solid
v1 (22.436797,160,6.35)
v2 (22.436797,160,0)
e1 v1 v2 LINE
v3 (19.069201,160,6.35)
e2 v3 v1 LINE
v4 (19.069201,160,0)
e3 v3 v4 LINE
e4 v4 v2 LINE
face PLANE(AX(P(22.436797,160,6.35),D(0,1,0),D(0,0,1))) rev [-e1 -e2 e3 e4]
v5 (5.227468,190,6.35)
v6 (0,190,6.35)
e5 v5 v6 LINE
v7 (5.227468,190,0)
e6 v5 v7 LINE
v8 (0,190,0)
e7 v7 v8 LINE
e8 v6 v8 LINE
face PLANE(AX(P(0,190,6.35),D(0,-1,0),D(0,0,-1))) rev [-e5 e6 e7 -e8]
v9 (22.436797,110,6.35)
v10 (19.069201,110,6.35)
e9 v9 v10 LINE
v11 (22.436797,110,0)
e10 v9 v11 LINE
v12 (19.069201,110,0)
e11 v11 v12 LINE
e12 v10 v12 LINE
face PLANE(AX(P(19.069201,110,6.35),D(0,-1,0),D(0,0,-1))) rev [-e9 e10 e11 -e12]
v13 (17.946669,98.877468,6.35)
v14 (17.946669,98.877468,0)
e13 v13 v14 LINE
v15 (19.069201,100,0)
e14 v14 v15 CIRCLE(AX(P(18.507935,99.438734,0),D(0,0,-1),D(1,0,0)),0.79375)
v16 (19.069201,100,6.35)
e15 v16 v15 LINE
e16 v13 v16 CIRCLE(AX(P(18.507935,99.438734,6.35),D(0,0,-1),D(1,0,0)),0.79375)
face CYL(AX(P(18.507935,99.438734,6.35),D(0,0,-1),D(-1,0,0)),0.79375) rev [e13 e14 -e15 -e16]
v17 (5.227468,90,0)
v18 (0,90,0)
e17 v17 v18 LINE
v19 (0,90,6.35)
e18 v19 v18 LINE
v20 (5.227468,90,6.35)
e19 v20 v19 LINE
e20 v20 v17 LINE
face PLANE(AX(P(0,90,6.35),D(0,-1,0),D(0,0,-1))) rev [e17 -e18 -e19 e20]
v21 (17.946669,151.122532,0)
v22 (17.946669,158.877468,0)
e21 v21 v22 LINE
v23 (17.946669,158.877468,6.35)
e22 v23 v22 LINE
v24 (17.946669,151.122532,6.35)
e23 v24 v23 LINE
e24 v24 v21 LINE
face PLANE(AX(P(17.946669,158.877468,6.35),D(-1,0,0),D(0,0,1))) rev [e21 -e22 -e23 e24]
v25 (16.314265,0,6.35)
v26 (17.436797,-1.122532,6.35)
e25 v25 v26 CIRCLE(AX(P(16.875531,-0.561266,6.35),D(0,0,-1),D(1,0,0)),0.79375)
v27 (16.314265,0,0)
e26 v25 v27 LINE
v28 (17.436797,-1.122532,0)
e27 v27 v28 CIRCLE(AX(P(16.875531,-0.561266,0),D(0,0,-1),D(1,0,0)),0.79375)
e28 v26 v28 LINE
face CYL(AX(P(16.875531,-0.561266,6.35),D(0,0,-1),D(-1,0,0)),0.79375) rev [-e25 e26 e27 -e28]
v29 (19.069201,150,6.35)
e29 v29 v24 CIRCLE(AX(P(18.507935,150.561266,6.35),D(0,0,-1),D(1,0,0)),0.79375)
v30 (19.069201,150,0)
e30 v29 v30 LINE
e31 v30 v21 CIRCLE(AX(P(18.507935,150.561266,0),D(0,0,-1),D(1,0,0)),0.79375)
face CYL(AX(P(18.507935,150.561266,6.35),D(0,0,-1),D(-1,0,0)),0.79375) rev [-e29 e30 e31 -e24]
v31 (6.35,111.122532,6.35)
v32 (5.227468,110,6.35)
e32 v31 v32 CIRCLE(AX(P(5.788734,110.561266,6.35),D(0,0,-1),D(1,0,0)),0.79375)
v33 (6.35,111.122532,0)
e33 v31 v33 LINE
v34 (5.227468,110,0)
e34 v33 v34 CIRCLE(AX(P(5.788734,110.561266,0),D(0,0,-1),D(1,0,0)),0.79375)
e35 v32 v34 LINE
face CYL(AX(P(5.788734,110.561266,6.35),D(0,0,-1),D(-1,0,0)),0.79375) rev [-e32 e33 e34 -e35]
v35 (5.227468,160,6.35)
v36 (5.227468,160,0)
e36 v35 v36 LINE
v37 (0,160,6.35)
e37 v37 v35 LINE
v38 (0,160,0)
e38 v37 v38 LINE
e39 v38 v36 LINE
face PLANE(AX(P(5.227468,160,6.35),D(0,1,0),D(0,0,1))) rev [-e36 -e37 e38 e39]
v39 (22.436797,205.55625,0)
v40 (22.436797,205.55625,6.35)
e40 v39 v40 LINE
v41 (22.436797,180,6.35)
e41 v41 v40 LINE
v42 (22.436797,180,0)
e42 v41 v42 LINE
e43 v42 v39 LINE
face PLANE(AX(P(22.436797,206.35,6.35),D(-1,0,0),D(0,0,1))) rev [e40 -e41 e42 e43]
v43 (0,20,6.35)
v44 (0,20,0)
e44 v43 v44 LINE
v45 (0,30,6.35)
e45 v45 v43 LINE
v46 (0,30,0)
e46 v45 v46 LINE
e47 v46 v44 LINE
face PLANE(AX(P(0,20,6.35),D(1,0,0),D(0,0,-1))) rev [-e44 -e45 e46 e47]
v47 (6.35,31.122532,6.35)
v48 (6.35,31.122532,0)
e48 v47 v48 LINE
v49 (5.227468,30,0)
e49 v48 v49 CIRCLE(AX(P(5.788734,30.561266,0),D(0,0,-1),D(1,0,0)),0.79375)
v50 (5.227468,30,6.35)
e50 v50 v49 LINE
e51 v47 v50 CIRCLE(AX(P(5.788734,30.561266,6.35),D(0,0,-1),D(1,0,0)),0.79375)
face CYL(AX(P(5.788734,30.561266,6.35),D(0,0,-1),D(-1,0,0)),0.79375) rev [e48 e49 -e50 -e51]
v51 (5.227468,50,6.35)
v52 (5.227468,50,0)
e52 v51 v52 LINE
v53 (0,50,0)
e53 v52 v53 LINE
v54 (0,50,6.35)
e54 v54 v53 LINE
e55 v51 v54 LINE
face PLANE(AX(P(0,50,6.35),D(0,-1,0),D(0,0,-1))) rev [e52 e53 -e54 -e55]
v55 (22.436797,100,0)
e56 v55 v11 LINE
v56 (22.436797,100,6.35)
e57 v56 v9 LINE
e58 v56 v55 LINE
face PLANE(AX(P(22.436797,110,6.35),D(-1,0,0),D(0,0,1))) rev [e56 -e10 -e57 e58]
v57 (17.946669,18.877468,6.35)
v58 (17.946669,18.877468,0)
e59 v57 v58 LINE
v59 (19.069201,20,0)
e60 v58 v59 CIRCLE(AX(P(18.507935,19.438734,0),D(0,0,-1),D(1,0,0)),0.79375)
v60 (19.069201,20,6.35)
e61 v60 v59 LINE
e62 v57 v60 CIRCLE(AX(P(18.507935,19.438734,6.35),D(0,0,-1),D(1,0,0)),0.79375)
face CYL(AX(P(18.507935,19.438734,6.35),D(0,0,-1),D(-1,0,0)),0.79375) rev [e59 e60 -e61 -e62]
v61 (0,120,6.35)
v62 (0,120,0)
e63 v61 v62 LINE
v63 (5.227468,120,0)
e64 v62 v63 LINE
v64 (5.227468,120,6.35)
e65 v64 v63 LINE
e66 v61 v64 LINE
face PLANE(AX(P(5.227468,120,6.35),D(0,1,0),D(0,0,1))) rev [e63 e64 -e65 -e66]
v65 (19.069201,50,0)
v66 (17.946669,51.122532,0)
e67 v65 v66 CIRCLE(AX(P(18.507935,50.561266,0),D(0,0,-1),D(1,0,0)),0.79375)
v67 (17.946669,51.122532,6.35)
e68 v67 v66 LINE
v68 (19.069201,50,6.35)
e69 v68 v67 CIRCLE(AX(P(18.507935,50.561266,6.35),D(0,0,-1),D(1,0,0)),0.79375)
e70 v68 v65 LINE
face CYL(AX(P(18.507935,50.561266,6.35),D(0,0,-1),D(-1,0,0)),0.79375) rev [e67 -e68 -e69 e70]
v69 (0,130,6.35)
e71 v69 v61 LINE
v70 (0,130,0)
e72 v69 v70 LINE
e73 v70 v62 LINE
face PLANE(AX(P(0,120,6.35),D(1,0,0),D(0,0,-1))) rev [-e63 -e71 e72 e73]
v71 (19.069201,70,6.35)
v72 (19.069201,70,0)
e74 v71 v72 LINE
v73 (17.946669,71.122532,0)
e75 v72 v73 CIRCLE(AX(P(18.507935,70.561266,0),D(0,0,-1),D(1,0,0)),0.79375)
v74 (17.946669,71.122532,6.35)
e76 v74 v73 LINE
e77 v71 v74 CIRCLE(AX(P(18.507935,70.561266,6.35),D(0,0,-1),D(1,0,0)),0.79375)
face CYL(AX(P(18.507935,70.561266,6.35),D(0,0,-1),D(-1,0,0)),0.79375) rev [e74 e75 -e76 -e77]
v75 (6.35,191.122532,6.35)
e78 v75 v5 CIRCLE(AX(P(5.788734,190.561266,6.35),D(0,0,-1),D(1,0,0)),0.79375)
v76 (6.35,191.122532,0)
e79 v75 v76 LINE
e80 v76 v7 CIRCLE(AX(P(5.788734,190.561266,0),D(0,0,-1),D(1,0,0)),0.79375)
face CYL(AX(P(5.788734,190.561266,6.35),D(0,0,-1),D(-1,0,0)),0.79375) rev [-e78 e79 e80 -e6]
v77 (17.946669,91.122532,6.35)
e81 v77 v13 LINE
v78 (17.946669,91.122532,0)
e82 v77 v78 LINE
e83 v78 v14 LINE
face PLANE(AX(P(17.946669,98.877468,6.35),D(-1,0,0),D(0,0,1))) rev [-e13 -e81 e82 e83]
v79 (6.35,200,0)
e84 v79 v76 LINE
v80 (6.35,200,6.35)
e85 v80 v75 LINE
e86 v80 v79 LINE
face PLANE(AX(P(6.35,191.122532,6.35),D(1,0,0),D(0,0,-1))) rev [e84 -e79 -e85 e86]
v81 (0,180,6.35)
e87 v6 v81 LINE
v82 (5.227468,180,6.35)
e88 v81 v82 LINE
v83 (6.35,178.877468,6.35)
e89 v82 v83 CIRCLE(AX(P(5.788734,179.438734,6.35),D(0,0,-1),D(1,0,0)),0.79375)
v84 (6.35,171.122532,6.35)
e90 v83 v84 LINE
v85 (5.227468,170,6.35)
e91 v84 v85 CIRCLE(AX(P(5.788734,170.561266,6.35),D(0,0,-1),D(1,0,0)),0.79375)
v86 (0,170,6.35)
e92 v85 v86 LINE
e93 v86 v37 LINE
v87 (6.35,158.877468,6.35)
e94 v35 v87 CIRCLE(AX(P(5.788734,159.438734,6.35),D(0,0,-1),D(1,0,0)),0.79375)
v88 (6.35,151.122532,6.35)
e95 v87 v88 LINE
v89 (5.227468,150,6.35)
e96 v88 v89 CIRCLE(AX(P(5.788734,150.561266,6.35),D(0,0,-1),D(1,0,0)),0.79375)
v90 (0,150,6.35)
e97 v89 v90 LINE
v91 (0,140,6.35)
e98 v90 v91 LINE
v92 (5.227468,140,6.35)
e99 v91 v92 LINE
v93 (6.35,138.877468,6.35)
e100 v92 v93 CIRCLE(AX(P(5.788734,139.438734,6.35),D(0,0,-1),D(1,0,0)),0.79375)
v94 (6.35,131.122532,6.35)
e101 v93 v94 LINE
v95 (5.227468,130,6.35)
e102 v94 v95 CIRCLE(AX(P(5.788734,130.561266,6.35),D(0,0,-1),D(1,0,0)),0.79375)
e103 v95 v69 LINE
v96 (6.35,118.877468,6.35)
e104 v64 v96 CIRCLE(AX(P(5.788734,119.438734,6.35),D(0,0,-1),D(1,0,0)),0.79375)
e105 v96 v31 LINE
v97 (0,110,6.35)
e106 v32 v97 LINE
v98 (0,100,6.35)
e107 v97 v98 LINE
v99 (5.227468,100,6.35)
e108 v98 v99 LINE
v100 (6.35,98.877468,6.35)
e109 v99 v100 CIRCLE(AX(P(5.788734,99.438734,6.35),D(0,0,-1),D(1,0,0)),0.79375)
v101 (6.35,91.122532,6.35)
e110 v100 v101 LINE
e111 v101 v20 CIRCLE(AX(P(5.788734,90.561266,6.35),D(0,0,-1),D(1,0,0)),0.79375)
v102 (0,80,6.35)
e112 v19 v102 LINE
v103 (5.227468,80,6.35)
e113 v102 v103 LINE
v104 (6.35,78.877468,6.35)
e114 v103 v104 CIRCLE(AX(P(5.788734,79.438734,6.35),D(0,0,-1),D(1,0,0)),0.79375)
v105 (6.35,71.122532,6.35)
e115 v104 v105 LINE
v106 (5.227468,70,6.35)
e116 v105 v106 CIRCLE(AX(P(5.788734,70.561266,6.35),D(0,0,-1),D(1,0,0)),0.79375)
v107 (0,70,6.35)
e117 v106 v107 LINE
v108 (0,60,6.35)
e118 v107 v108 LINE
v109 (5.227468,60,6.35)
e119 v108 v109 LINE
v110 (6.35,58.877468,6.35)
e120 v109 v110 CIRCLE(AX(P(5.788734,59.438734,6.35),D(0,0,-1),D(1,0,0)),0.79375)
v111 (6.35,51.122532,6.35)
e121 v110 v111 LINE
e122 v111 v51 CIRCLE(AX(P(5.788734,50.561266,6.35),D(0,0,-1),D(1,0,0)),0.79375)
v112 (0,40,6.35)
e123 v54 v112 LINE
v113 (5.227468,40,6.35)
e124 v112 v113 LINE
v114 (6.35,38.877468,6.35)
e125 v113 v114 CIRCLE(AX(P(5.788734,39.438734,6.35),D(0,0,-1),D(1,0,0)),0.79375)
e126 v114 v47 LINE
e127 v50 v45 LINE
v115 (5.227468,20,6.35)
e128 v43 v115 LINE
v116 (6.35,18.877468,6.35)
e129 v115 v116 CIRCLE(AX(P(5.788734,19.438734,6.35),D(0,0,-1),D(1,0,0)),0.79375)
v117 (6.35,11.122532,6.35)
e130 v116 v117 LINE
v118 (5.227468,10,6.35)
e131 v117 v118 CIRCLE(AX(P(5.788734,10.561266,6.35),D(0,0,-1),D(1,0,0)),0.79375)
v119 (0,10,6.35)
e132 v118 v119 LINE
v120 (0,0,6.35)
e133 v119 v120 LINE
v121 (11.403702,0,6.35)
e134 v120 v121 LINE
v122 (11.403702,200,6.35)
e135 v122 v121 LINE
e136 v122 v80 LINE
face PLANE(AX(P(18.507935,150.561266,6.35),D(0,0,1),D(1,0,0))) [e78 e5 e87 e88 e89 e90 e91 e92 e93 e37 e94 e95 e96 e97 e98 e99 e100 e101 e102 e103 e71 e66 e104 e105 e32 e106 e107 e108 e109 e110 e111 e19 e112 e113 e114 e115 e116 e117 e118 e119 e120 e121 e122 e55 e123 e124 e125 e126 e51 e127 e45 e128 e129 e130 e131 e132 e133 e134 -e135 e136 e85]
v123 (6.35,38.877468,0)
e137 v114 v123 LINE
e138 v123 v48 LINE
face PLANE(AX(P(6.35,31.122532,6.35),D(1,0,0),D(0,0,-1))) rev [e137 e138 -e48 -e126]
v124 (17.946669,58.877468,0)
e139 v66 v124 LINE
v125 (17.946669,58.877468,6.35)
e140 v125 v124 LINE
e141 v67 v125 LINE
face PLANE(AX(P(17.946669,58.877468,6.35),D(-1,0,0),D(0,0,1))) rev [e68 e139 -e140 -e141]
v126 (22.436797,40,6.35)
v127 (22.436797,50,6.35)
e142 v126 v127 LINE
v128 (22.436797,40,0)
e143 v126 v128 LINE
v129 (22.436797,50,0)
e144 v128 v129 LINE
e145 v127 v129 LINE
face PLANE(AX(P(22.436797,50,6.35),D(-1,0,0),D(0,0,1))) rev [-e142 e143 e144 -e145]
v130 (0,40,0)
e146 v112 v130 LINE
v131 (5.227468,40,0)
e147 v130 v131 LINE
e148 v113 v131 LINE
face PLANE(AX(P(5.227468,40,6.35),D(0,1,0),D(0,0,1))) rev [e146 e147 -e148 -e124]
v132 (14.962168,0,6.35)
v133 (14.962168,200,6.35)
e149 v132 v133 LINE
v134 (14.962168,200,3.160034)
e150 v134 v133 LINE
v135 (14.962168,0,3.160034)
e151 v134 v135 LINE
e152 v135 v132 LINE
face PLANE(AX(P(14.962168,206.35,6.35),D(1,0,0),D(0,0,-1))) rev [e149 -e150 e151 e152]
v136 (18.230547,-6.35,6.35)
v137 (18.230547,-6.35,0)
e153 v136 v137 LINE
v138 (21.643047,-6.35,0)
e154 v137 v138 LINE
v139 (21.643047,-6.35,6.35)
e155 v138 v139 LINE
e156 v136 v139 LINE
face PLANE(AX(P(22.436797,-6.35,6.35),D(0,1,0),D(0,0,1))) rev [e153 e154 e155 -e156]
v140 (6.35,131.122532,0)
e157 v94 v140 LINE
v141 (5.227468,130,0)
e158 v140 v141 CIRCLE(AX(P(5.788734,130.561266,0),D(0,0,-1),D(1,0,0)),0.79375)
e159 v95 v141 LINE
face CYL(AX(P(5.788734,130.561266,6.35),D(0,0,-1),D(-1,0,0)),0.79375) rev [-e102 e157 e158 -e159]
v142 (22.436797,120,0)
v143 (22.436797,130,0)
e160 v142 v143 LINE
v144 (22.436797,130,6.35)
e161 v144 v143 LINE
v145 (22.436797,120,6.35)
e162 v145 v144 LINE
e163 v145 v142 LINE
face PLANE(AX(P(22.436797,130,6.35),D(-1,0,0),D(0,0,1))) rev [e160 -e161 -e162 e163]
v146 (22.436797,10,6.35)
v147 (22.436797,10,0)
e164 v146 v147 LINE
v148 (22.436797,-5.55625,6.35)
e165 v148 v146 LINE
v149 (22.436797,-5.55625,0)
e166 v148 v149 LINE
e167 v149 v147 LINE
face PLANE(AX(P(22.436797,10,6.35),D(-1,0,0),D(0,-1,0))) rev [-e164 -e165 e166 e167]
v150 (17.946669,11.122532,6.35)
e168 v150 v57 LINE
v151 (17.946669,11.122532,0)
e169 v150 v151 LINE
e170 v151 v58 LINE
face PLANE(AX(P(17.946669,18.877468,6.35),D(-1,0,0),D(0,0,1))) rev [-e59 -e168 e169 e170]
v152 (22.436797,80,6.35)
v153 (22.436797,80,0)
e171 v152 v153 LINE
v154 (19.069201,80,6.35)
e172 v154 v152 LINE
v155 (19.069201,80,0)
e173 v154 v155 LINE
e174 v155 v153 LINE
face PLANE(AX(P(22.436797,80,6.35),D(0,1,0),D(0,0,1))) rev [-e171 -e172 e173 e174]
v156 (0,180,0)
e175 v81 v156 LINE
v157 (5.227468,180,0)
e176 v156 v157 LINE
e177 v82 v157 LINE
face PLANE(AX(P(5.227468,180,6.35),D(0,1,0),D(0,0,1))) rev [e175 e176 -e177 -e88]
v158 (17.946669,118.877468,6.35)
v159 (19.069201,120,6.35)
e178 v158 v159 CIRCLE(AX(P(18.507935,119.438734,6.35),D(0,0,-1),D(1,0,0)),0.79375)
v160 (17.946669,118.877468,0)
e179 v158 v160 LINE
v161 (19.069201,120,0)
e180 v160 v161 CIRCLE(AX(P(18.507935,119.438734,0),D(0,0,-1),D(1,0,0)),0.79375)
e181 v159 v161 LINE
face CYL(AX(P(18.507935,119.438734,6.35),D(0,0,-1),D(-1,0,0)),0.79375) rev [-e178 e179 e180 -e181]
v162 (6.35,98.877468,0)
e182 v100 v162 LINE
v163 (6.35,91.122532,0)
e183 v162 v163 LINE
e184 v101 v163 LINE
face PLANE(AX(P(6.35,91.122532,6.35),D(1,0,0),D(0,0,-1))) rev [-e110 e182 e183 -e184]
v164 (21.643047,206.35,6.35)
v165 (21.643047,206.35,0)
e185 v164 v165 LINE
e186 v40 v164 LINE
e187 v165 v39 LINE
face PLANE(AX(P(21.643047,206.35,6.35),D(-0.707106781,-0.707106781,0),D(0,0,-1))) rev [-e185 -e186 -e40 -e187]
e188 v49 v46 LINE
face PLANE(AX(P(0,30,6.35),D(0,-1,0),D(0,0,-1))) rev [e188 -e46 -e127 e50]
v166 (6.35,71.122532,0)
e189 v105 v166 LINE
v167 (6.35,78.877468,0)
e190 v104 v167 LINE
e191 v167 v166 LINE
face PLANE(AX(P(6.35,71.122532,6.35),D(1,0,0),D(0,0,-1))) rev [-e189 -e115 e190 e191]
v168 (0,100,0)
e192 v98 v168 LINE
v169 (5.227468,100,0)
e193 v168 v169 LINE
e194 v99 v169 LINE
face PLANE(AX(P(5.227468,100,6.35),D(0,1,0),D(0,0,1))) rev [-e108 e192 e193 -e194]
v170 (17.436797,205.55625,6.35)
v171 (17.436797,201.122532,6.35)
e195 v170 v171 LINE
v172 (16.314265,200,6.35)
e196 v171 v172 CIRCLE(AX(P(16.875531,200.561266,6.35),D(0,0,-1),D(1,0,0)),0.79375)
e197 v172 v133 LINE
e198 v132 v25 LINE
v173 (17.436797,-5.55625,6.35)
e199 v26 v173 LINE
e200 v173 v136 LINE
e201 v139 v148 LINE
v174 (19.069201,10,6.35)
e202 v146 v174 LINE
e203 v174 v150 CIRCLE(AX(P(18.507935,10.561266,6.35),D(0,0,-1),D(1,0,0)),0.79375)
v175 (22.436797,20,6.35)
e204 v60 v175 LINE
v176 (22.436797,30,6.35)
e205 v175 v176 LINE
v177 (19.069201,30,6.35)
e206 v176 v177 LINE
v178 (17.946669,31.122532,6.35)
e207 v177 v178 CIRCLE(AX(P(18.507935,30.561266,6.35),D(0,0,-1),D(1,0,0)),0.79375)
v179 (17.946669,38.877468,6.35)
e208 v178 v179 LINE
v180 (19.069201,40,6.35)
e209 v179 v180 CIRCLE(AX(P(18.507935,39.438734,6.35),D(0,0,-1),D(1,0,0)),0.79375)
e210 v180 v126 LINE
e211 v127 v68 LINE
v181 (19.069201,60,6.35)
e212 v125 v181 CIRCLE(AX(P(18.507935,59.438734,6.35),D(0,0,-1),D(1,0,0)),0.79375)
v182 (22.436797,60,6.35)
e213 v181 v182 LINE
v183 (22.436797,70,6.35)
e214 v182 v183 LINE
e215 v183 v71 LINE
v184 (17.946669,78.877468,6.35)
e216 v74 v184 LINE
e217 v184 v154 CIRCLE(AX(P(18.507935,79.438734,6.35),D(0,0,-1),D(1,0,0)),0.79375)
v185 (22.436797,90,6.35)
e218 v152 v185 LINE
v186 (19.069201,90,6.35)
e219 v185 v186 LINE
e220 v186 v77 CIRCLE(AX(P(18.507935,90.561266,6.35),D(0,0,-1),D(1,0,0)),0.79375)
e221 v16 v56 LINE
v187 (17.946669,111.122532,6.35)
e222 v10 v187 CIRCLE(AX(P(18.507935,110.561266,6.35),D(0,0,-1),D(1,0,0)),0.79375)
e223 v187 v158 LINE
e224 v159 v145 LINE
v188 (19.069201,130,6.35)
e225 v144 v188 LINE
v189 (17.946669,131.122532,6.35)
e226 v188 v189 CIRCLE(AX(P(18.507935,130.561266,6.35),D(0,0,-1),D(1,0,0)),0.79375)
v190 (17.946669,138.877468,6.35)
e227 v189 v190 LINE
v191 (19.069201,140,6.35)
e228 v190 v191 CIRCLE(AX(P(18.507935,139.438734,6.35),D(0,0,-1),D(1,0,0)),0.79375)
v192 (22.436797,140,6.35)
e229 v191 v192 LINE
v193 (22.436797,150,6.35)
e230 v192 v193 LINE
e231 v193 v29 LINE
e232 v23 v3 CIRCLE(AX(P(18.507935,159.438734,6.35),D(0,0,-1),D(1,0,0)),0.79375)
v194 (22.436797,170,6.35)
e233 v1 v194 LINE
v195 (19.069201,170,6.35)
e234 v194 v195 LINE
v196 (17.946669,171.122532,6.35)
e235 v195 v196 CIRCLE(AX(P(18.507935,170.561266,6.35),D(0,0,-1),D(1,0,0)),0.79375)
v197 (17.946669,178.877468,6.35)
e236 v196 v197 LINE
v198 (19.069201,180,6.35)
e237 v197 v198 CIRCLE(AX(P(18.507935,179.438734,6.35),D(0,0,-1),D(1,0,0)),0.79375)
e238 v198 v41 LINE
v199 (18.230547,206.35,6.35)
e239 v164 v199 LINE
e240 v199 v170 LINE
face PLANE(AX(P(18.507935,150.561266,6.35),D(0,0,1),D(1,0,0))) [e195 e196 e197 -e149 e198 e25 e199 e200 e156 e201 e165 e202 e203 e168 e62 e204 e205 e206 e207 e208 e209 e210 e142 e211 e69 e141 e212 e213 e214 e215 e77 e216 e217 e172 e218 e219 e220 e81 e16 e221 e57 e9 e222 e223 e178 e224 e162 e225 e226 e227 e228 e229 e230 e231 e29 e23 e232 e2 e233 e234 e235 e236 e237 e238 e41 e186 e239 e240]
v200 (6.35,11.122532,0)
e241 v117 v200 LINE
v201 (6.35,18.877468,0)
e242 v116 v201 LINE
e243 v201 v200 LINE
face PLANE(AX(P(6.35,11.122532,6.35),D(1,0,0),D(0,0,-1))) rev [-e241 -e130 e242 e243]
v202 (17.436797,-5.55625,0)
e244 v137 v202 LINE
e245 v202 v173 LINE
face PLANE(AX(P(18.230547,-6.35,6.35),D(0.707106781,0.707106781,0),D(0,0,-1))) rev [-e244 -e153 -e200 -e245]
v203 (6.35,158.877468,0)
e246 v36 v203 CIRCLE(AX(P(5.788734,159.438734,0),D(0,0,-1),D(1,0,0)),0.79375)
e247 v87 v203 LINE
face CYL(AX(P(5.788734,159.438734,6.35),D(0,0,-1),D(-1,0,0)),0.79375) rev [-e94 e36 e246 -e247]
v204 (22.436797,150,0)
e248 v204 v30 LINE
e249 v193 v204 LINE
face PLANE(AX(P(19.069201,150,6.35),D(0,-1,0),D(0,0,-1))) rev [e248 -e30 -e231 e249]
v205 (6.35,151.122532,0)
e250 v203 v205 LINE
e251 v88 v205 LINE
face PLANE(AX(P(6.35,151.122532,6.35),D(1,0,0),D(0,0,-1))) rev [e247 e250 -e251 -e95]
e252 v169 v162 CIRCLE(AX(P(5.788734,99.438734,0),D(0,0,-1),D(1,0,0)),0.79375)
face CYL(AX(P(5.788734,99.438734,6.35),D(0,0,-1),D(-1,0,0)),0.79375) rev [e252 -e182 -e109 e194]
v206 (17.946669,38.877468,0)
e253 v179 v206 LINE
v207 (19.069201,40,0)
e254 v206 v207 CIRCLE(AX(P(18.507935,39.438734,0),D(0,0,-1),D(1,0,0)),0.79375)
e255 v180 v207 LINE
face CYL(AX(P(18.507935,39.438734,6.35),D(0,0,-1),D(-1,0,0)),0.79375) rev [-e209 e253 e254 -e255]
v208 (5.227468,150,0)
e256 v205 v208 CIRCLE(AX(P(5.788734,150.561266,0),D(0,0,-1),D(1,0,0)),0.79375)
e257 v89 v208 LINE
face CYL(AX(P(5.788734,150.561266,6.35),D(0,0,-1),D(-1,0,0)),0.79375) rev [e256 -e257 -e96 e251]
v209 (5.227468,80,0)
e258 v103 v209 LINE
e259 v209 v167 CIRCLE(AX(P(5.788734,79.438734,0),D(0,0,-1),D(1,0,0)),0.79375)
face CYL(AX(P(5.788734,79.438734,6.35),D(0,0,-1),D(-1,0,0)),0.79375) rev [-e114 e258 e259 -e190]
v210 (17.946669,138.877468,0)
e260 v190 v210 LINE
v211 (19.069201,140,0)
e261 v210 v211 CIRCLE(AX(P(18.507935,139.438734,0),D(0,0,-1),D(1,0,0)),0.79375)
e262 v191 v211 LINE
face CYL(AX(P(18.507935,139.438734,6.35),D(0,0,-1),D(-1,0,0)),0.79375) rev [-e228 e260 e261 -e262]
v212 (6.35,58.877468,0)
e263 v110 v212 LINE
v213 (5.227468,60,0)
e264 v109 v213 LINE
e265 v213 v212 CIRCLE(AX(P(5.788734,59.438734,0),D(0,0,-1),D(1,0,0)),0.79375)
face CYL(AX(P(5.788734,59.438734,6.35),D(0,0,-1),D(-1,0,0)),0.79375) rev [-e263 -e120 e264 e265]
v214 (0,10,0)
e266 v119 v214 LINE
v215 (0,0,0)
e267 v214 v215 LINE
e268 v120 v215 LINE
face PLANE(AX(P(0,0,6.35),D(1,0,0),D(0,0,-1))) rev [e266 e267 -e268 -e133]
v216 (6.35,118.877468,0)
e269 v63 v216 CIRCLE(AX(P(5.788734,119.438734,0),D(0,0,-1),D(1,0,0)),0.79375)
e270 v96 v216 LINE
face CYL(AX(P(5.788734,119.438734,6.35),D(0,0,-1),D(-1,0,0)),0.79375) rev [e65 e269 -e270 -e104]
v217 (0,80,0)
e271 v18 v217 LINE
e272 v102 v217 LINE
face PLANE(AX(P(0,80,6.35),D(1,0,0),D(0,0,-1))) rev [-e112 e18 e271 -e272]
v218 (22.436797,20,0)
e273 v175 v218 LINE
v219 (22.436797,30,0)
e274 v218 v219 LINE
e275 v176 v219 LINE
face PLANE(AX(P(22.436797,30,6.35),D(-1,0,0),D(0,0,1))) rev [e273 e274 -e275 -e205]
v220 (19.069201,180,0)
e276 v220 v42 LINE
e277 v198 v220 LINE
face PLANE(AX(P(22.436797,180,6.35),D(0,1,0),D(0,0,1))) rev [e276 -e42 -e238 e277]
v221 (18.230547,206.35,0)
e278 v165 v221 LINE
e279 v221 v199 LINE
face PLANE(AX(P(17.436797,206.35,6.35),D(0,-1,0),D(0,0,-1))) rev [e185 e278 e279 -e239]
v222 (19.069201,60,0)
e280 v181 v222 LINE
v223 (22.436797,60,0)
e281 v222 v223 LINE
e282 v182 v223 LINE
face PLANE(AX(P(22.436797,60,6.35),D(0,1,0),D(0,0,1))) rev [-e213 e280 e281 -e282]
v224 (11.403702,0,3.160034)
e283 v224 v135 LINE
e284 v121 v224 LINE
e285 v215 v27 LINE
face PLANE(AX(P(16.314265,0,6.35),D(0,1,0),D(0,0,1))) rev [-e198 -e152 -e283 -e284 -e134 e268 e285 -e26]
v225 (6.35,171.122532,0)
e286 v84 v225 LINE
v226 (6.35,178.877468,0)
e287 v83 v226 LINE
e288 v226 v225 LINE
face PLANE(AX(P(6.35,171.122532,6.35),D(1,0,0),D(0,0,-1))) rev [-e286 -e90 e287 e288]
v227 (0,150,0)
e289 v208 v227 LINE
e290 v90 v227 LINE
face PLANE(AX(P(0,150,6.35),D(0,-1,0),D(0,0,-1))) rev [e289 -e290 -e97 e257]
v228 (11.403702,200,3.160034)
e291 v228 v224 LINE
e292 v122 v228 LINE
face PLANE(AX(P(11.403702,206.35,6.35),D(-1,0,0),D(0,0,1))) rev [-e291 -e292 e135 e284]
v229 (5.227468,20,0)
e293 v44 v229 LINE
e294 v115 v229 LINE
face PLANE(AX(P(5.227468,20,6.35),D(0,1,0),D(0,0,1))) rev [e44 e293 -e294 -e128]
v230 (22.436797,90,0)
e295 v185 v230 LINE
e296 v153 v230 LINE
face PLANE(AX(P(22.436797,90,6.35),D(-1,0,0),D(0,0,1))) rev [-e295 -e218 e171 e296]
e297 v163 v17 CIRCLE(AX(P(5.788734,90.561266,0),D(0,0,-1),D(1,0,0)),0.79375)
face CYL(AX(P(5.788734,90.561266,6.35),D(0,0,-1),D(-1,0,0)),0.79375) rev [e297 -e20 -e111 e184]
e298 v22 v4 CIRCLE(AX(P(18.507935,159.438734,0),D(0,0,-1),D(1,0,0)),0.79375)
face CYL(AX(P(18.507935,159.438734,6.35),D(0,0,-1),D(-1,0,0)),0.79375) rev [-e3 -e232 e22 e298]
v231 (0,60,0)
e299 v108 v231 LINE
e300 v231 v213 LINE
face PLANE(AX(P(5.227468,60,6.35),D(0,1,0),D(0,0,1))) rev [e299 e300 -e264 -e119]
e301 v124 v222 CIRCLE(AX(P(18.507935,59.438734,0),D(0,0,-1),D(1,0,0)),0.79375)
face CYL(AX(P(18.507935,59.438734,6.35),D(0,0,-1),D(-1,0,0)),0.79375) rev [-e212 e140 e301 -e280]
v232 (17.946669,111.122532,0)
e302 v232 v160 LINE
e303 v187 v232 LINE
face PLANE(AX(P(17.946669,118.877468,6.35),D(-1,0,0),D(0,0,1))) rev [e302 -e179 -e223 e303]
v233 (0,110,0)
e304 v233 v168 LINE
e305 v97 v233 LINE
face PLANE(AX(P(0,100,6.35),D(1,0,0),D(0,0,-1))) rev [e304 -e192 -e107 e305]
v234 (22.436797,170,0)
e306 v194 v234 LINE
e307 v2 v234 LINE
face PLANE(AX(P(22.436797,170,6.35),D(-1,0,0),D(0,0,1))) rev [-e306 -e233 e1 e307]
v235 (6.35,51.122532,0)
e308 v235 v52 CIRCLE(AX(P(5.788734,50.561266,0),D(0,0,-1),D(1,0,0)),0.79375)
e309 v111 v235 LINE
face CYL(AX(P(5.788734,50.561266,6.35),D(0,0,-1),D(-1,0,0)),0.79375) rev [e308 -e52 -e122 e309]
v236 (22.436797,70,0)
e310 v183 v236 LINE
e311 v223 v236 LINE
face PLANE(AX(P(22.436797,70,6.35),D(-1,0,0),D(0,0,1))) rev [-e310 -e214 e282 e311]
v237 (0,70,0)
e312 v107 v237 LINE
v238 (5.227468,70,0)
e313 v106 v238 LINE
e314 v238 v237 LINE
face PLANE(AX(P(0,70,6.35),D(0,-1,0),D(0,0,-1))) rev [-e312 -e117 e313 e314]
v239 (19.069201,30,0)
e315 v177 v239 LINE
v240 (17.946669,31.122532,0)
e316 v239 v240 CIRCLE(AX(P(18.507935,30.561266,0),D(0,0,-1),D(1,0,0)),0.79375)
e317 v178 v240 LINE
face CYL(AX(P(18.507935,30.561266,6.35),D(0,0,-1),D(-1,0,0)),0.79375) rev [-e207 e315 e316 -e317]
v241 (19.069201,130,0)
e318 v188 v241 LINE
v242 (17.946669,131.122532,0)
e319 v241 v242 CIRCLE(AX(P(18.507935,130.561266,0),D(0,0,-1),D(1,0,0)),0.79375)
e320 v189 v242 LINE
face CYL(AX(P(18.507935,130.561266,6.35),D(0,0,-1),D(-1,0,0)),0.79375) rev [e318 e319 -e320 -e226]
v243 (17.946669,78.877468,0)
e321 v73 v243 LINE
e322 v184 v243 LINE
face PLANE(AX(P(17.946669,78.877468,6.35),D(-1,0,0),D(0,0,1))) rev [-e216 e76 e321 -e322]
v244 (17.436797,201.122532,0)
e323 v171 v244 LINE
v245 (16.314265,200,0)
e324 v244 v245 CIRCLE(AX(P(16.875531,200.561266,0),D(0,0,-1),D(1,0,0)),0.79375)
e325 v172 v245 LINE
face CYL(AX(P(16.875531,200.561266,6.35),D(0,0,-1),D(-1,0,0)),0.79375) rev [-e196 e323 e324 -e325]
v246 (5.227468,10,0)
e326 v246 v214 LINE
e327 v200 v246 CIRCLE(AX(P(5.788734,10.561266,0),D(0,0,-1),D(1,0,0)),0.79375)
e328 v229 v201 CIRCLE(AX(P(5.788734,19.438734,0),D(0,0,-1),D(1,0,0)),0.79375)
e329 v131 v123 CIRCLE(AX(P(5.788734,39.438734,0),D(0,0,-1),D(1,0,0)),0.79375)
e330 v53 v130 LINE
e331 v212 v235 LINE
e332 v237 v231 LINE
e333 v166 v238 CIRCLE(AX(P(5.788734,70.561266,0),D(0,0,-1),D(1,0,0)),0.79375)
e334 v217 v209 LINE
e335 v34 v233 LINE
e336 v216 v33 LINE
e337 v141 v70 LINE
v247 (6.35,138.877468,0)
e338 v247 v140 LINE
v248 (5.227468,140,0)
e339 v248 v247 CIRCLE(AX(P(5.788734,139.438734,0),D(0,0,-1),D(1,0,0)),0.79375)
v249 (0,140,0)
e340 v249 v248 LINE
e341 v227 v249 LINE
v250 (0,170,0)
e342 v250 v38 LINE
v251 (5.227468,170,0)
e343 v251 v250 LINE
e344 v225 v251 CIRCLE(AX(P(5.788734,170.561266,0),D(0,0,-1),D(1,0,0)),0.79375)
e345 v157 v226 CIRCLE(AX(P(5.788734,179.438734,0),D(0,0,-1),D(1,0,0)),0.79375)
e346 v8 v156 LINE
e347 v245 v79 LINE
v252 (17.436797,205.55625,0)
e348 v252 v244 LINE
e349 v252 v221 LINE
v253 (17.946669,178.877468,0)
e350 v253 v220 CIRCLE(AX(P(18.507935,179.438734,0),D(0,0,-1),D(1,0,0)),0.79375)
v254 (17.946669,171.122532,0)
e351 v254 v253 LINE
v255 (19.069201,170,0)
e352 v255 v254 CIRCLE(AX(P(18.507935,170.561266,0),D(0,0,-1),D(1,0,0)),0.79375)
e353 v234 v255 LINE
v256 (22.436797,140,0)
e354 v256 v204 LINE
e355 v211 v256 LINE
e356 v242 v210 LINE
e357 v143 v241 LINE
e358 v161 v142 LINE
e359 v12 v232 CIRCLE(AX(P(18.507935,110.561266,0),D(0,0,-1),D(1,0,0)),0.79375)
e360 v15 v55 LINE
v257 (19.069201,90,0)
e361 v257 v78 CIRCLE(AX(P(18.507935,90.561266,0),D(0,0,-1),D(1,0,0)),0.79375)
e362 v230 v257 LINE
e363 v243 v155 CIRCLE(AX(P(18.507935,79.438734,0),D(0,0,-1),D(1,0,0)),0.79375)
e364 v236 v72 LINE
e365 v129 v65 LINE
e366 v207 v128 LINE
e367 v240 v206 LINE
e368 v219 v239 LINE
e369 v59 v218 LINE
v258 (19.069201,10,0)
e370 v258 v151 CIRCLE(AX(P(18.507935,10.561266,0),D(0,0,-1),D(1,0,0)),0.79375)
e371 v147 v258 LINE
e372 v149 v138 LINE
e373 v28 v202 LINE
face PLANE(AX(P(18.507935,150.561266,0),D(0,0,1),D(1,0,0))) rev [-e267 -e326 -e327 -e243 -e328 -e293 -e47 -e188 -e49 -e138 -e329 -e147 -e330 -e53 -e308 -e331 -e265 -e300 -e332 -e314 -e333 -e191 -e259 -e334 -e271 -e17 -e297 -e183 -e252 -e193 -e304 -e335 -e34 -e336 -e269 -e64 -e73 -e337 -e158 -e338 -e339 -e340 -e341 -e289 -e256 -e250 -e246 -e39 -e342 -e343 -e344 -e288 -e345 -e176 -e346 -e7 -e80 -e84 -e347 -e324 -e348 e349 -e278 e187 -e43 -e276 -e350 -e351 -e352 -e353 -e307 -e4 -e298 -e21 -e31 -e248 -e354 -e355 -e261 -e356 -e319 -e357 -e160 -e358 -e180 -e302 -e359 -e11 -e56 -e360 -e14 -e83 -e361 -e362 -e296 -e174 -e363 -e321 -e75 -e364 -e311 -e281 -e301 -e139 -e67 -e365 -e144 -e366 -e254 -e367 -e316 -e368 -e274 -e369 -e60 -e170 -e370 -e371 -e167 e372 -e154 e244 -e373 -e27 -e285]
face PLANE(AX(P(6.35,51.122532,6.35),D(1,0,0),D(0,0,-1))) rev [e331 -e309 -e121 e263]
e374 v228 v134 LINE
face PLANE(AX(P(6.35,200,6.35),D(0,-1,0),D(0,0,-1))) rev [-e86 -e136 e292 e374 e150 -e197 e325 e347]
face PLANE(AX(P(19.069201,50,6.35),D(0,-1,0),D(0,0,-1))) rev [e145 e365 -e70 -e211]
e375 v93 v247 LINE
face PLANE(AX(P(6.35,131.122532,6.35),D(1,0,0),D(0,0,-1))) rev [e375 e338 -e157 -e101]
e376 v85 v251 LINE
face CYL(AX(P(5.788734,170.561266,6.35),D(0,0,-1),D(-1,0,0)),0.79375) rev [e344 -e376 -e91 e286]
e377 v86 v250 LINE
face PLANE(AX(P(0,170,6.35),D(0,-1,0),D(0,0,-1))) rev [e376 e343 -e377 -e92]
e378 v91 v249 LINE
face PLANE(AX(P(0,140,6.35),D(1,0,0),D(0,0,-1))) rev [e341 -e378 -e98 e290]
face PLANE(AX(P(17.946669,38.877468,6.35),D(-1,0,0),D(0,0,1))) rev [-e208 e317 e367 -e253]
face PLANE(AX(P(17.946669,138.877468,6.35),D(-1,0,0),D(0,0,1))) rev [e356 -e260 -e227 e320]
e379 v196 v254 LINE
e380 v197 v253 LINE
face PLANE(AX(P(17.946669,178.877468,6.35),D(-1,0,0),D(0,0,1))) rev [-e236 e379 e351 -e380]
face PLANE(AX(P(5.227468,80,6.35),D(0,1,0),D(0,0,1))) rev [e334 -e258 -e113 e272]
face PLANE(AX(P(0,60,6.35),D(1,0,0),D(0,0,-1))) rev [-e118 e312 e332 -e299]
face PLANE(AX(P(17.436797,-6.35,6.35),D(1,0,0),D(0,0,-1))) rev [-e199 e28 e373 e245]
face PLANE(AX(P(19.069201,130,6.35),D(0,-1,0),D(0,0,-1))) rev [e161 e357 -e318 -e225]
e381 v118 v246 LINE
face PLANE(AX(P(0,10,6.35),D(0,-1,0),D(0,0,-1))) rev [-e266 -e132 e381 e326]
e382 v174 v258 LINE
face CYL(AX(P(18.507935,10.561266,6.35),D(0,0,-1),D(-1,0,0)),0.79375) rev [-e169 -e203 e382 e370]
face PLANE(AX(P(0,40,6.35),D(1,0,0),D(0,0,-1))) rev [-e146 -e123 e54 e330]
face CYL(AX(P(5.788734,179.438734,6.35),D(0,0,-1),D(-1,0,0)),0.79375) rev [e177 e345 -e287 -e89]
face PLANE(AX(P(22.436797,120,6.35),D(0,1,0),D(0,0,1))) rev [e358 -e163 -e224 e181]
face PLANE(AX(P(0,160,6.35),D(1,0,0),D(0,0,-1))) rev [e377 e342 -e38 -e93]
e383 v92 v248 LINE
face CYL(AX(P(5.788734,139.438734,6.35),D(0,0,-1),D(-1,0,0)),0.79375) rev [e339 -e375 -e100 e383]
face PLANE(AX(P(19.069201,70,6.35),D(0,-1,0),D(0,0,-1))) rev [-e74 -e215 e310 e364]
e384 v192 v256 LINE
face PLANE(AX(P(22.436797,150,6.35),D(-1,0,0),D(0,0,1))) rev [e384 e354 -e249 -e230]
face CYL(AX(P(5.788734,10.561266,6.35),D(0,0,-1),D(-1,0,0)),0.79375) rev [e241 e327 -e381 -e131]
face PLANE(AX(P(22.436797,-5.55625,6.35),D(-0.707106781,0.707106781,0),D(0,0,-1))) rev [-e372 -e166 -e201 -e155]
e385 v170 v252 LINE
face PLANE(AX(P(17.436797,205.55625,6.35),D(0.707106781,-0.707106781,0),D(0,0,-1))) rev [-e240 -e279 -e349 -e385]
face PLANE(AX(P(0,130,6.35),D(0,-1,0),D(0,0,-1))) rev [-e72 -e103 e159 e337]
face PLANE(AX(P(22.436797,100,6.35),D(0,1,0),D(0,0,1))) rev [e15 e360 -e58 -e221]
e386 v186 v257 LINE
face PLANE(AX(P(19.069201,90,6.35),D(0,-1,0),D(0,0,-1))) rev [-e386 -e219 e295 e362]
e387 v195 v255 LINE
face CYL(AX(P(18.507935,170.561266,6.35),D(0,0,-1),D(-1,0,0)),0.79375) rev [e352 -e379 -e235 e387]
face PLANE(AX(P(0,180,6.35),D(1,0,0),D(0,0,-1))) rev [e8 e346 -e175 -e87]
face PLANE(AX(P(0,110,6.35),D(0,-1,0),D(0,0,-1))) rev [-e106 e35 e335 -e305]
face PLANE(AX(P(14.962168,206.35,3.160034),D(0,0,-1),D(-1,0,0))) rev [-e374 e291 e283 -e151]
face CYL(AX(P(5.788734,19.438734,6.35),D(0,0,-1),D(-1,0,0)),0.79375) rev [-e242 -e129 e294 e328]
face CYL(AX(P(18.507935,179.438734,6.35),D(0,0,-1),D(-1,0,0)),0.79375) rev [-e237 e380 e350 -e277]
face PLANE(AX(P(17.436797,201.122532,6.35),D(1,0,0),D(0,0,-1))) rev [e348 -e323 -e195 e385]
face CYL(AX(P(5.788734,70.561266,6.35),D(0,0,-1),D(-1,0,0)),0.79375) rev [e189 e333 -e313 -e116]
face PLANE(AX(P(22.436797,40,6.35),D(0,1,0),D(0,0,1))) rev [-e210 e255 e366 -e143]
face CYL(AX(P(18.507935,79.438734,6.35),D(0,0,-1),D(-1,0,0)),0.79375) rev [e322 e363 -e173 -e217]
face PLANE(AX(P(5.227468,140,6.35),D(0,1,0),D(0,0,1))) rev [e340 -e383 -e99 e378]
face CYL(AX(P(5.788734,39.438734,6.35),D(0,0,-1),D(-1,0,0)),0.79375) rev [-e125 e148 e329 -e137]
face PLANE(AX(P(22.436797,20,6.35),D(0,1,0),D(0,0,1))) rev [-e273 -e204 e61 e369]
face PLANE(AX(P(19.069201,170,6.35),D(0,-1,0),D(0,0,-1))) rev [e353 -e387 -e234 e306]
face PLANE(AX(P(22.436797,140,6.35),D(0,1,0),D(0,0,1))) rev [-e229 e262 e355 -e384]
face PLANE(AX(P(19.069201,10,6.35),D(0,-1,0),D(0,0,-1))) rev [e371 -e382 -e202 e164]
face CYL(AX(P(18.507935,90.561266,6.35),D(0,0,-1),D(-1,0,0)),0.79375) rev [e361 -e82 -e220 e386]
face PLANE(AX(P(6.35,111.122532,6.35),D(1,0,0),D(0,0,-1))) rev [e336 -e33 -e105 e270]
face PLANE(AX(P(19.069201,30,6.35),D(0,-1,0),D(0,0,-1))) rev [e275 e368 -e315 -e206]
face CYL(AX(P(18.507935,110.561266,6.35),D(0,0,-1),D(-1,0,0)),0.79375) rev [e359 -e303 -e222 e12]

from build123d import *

# Parameters (mm, degrees)
BOSS_EXTRUDE1_DEPTH = 6.35
CHAMFER1_SIZE       = 0.79375
SKETCH16_W          = 3.558466008
SKETCH16_H          = 3.18996611
CUT_EXTRUDE14_DEPTH = 208.663320883


# Read off the part's stored shape, not the designer's step: Boss-Extrude1
with BuildPart() as part:
    # Boss-Extrude1 outline → Boss-Extrude1 (new body)
    with BuildSketch(Plane.XY):
        with BuildLine():
            Line((22.436796564, 150), (19.069200519, 150))
            ThreePointArc((19.069200519, 150), (17.946668504, 150), (17.946668504, 151.122532015))
            Line((17.946668504, 151.122532015), (17.946668504, 158.877467985))
            ThreePointArc((17.946668504, 158.877467985), (17.946668504, 160), (19.069200519, 160))
            Line((19.069200519, 160), (22.436796564, 160))
            Line((22.436796564, 160), (22.436796564, 170))
            Line((22.436796564, 170), (19.069200519, 170))
            ThreePointArc((19.069200519, 170), (17.946668504, 170), (17.946668504, 171.122532015))
            Line((17.946668504, 171.122532015), (17.946668504, 178.877467985))
            ThreePointArc((17.946668504, 178.877467985), (17.946668504, 180), (19.069200519, 180))
            Line((19.069200519, 180), (22.436796564, 180))
            Line((22.436796564, 180), (22.436796564, 206.35))
            Line((22.436796564, 206.35), (17.436796564, 206.35))
            Line((17.436796564, 206.35), (17.436796564, 201.122532015))
            ThreePointArc((17.436796564, 201.122532015), (17.436796564, 200), (16.314264549, 200))
            Line((16.314264549, 200), (6.35, 200))
            Line((6.35, 200), (6.35, 191.122532015))
            ThreePointArc((6.35, 191.122532015), (6.35, 190), (5.227467985, 190))
            Line((5.227467985, 190), (0, 190))
            Line((0, 190), (0, 180))
            Line((0, 180), (5.227467985, 180))
            ThreePointArc((5.227467985, 180), (6.35, 180), (6.35, 178.877467985))
            Line((6.35, 178.877467985), (6.35, 171.122532015))
            ThreePointArc((6.35, 171.122532015), (6.35, 170), (5.227467985, 170))
            Line((5.227467985, 170), (0, 170))
            Line((0, 170), (0, 160))
            Line((0, 160), (5.227467985, 160))
            ThreePointArc((5.227467985, 160), (6.35, 160), (6.35, 158.877467985))
            Line((6.35, 158.877467985), (6.35, 151.122532015))
            ThreePointArc((6.35, 151.122532015), (6.35, 150), (5.227467985, 150))
            Line((5.227467985, 150), (0, 150))
            Line((0, 150), (0, 140))
            Line((0, 140), (5.227467985, 140))
            ThreePointArc((5.227467985, 140), (6.35, 140), (6.35, 138.877467985))
            Line((6.35, 138.877467985), (6.35, 131.122532015))
            ThreePointArc((6.35, 131.122532015), (6.35, 130), (5.227467985, 130))
            Line((5.227467985, 130), (0, 130))
            Line((0, 130), (0, 120))
            Line((0, 120), (5.227467985, 120))
            ThreePointArc((5.227467985, 120), (6.35, 120), (6.35, 118.877467985))
            Line((6.35, 118.877467985), (6.35, 111.122532015))
            ThreePointArc((6.35, 111.122532015), (6.35, 110), (5.227467985, 110))
            Line((5.227467985, 110), (0, 110))
            Line((0, 110), (0, 100))
            Line((0, 100), (5.227467985, 100))
            ThreePointArc((5.227467985, 100), (6.35, 100), (6.35, 98.877467985))
            Line((6.35, 98.877467985), (6.35, 91.122532015))
            ThreePointArc((6.35, 91.122532015), (6.35, 90), (5.227467985, 90))
            Line((5.227467985, 90), (0, 90))
            Line((0, 90), (0, 80))
            Line((0, 80), (5.227467985, 80))
            ThreePointArc((5.227467985, 80), (6.35, 80), (6.35, 78.877467985))
            Line((6.35, 78.877467985), (6.35, 71.122532015))
            ThreePointArc((6.35, 71.122532015), (6.35, 70), (5.227467985, 70))
            Line((5.227467985, 70), (0, 70))
            Line((0, 70), (0, 60))
            Line((0, 60), (5.227467985, 60))
            ThreePointArc((5.227467985, 60), (6.35, 60), (6.35, 58.877467985))
            Line((6.35, 58.877467985), (6.35, 51.122532015))
            ThreePointArc((6.35, 51.122532015), (6.35, 50), (5.227467985, 50))
            Line((5.227467985, 50), (0, 50))
            Line((0, 50), (0, 40))
            Line((0, 40), (5.227467985, 40))
            ThreePointArc((5.227467985, 40), (6.35, 40), (6.35, 38.877467985))
            Line((6.35, 38.877467985), (6.35, 31.122532015))
            ThreePointArc((6.35, 31.122532015), (6.35, 30), (5.227467985, 30))
            Line((5.227467985, 30), (0, 30))
            Line((0, 30), (0, 20))
            Line((0, 20), (5.227467985, 20))
            ThreePointArc((5.227467985, 20), (6.35, 20), (6.35, 18.877467985))
            Line((6.35, 18.877467985), (6.35, 11.122532015))
            ThreePointArc((6.35, 11.122532015), (6.35, 10), (5.227467985, 10))
            Line((5.227467985, 10), (0, 10))
            Line((0, 10), (0, 0))
            Line((0, 0), (16.314264549, 0))
            ThreePointArc((16.314264549, 0), (17.436796564, 0), (17.436796564, -1.122532015))
            Line((17.436796564, -1.122532015), (17.436796564, -6.35))
            Line((17.436796564, -6.35), (22.436796564, -6.35))
            Line((22.436796564, -6.35), (22.436796564, 10))
            Line((22.436796564, 10), (19.069200519, 10))
            ThreePointArc((19.069200519, 10), (17.946668504, 10), (17.946668504, 11.122532015))
            Line((17.946668504, 11.122532015), (17.946668504, 18.877467985))
            ThreePointArc((17.946668504, 18.877467985), (17.946668504, 20), (19.069200519, 20))
            Line((19.069200519, 20), (22.436796564, 20))
            Line((22.436796564, 20), (22.436796564, 30))
            Line((22.436796564, 30), (19.069200519, 30))
            ThreePointArc((19.069200519, 30), (17.946668504, 30), (17.946668504, 31.122532015))
            Line((17.946668504, 31.122532015), (17.946668504, 38.877467985))
            ThreePointArc((17.946668504, 38.877467985), (17.946668504, 40), (19.069200519, 40))
            Line((19.069200519, 40), (22.436796564, 40))
            Line((22.436796564, 40), (22.436796564, 50))
            Line((22.436796564, 50), (19.069200519, 50))
            ThreePointArc((19.069200519, 50), (17.946668504, 50), (17.946668504, 51.122532015))
            Line((17.946668504, 51.122532015), (17.946668504, 58.877467985))
            ThreePointArc((17.946668504, 58.877467985), (17.946668504, 60), (19.069200519, 60))
            Line((19.069200519, 60), (22.436796564, 60))
            Line((22.436796564, 60), (22.436796564, 70))
            Line((22.436796564, 70), (19.069200519, 70))
            ThreePointArc((19.069200519, 70), (17.946668504, 70), (17.946668504, 71.122532015))
            Line((17.946668504, 71.122532015), (17.946668504, 78.877467985))
            ThreePointArc((17.946668504, 78.877467985), (17.946668504, 80), (19.069200519, 80))
            Line((19.069200519, 80), (22.436796564, 80))
            Line((22.436796564, 80), (22.436796564, 90))
            Line((22.436796564, 90), (19.069200519, 90))
            ThreePointArc((19.069200519, 90), (17.946668504, 90), (17.946668504, 91.122532015))
            Line((17.946668504, 91.122532015), (17.946668504, 98.877467985))
            ThreePointArc((17.946668504, 98.877467985), (17.946668504, 100), (19.069200519, 100))
            Line((19.069200519, 100), (22.436796564, 100))
            Line((22.436796564, 100), (22.436796564, 110))
            Line((22.436796564, 110), (19.069200519, 110))
            ThreePointArc((19.069200519, 110), (17.946668504, 110), (17.946668504, 111.122532015))
            Line((17.946668504, 111.122532015), (17.946668504, 118.877467985))
            ThreePointArc((17.946668504, 118.877467985), (17.946668504, 120), (19.069200519, 120))
            Line((19.069200519, 120), (22.436796564, 120))
            Line((22.436796564, 120), (22.436796564, 130))
            Line((22.436796564, 130), (19.069200519, 130))
            ThreePointArc((19.069200519, 130), (17.946668504, 130), (17.946668504, 131.122532015))
            Line((17.946668504, 131.122532015), (17.946668504, 138.877467985))
            ThreePointArc((17.946668504, 138.877467985), (17.946668504, 140), (19.069200519, 140))
            Line((19.069200519, 140), (22.436796564, 140))
            Line((22.436796564, 140), (22.436796564, 150))
        make_face()
    extrude(amount=BOSS_EXTRUDE1_DEPTH)

    # Chamfer1
    chamfer1_edges = [part.edges().sort_by_distance(p)[0] for p in [
        (22.436796564, -6.35, 3.175),
        (17.436796564, -6.35, 3.175),
        (17.436796564, 206.35, 3.175),
        (22.436796564, 206.35, 3.175),
    ]]
    chamfer(chamfer1_edges, length=CHAMFER1_SIZE)

    # Sketch16 → Cut-Extrude14 (cut, through all)
    with BuildSketch(Plane.XZ):
        with Locations((13.182935446, 4.755016945)):
            Rectangle(SKETCH16_W, SKETCH16_H)
    extrude(amount=-CUT_EXTRUDE14_DEPTH, mode=Mode.SUBTRACT)


solid = part.part
